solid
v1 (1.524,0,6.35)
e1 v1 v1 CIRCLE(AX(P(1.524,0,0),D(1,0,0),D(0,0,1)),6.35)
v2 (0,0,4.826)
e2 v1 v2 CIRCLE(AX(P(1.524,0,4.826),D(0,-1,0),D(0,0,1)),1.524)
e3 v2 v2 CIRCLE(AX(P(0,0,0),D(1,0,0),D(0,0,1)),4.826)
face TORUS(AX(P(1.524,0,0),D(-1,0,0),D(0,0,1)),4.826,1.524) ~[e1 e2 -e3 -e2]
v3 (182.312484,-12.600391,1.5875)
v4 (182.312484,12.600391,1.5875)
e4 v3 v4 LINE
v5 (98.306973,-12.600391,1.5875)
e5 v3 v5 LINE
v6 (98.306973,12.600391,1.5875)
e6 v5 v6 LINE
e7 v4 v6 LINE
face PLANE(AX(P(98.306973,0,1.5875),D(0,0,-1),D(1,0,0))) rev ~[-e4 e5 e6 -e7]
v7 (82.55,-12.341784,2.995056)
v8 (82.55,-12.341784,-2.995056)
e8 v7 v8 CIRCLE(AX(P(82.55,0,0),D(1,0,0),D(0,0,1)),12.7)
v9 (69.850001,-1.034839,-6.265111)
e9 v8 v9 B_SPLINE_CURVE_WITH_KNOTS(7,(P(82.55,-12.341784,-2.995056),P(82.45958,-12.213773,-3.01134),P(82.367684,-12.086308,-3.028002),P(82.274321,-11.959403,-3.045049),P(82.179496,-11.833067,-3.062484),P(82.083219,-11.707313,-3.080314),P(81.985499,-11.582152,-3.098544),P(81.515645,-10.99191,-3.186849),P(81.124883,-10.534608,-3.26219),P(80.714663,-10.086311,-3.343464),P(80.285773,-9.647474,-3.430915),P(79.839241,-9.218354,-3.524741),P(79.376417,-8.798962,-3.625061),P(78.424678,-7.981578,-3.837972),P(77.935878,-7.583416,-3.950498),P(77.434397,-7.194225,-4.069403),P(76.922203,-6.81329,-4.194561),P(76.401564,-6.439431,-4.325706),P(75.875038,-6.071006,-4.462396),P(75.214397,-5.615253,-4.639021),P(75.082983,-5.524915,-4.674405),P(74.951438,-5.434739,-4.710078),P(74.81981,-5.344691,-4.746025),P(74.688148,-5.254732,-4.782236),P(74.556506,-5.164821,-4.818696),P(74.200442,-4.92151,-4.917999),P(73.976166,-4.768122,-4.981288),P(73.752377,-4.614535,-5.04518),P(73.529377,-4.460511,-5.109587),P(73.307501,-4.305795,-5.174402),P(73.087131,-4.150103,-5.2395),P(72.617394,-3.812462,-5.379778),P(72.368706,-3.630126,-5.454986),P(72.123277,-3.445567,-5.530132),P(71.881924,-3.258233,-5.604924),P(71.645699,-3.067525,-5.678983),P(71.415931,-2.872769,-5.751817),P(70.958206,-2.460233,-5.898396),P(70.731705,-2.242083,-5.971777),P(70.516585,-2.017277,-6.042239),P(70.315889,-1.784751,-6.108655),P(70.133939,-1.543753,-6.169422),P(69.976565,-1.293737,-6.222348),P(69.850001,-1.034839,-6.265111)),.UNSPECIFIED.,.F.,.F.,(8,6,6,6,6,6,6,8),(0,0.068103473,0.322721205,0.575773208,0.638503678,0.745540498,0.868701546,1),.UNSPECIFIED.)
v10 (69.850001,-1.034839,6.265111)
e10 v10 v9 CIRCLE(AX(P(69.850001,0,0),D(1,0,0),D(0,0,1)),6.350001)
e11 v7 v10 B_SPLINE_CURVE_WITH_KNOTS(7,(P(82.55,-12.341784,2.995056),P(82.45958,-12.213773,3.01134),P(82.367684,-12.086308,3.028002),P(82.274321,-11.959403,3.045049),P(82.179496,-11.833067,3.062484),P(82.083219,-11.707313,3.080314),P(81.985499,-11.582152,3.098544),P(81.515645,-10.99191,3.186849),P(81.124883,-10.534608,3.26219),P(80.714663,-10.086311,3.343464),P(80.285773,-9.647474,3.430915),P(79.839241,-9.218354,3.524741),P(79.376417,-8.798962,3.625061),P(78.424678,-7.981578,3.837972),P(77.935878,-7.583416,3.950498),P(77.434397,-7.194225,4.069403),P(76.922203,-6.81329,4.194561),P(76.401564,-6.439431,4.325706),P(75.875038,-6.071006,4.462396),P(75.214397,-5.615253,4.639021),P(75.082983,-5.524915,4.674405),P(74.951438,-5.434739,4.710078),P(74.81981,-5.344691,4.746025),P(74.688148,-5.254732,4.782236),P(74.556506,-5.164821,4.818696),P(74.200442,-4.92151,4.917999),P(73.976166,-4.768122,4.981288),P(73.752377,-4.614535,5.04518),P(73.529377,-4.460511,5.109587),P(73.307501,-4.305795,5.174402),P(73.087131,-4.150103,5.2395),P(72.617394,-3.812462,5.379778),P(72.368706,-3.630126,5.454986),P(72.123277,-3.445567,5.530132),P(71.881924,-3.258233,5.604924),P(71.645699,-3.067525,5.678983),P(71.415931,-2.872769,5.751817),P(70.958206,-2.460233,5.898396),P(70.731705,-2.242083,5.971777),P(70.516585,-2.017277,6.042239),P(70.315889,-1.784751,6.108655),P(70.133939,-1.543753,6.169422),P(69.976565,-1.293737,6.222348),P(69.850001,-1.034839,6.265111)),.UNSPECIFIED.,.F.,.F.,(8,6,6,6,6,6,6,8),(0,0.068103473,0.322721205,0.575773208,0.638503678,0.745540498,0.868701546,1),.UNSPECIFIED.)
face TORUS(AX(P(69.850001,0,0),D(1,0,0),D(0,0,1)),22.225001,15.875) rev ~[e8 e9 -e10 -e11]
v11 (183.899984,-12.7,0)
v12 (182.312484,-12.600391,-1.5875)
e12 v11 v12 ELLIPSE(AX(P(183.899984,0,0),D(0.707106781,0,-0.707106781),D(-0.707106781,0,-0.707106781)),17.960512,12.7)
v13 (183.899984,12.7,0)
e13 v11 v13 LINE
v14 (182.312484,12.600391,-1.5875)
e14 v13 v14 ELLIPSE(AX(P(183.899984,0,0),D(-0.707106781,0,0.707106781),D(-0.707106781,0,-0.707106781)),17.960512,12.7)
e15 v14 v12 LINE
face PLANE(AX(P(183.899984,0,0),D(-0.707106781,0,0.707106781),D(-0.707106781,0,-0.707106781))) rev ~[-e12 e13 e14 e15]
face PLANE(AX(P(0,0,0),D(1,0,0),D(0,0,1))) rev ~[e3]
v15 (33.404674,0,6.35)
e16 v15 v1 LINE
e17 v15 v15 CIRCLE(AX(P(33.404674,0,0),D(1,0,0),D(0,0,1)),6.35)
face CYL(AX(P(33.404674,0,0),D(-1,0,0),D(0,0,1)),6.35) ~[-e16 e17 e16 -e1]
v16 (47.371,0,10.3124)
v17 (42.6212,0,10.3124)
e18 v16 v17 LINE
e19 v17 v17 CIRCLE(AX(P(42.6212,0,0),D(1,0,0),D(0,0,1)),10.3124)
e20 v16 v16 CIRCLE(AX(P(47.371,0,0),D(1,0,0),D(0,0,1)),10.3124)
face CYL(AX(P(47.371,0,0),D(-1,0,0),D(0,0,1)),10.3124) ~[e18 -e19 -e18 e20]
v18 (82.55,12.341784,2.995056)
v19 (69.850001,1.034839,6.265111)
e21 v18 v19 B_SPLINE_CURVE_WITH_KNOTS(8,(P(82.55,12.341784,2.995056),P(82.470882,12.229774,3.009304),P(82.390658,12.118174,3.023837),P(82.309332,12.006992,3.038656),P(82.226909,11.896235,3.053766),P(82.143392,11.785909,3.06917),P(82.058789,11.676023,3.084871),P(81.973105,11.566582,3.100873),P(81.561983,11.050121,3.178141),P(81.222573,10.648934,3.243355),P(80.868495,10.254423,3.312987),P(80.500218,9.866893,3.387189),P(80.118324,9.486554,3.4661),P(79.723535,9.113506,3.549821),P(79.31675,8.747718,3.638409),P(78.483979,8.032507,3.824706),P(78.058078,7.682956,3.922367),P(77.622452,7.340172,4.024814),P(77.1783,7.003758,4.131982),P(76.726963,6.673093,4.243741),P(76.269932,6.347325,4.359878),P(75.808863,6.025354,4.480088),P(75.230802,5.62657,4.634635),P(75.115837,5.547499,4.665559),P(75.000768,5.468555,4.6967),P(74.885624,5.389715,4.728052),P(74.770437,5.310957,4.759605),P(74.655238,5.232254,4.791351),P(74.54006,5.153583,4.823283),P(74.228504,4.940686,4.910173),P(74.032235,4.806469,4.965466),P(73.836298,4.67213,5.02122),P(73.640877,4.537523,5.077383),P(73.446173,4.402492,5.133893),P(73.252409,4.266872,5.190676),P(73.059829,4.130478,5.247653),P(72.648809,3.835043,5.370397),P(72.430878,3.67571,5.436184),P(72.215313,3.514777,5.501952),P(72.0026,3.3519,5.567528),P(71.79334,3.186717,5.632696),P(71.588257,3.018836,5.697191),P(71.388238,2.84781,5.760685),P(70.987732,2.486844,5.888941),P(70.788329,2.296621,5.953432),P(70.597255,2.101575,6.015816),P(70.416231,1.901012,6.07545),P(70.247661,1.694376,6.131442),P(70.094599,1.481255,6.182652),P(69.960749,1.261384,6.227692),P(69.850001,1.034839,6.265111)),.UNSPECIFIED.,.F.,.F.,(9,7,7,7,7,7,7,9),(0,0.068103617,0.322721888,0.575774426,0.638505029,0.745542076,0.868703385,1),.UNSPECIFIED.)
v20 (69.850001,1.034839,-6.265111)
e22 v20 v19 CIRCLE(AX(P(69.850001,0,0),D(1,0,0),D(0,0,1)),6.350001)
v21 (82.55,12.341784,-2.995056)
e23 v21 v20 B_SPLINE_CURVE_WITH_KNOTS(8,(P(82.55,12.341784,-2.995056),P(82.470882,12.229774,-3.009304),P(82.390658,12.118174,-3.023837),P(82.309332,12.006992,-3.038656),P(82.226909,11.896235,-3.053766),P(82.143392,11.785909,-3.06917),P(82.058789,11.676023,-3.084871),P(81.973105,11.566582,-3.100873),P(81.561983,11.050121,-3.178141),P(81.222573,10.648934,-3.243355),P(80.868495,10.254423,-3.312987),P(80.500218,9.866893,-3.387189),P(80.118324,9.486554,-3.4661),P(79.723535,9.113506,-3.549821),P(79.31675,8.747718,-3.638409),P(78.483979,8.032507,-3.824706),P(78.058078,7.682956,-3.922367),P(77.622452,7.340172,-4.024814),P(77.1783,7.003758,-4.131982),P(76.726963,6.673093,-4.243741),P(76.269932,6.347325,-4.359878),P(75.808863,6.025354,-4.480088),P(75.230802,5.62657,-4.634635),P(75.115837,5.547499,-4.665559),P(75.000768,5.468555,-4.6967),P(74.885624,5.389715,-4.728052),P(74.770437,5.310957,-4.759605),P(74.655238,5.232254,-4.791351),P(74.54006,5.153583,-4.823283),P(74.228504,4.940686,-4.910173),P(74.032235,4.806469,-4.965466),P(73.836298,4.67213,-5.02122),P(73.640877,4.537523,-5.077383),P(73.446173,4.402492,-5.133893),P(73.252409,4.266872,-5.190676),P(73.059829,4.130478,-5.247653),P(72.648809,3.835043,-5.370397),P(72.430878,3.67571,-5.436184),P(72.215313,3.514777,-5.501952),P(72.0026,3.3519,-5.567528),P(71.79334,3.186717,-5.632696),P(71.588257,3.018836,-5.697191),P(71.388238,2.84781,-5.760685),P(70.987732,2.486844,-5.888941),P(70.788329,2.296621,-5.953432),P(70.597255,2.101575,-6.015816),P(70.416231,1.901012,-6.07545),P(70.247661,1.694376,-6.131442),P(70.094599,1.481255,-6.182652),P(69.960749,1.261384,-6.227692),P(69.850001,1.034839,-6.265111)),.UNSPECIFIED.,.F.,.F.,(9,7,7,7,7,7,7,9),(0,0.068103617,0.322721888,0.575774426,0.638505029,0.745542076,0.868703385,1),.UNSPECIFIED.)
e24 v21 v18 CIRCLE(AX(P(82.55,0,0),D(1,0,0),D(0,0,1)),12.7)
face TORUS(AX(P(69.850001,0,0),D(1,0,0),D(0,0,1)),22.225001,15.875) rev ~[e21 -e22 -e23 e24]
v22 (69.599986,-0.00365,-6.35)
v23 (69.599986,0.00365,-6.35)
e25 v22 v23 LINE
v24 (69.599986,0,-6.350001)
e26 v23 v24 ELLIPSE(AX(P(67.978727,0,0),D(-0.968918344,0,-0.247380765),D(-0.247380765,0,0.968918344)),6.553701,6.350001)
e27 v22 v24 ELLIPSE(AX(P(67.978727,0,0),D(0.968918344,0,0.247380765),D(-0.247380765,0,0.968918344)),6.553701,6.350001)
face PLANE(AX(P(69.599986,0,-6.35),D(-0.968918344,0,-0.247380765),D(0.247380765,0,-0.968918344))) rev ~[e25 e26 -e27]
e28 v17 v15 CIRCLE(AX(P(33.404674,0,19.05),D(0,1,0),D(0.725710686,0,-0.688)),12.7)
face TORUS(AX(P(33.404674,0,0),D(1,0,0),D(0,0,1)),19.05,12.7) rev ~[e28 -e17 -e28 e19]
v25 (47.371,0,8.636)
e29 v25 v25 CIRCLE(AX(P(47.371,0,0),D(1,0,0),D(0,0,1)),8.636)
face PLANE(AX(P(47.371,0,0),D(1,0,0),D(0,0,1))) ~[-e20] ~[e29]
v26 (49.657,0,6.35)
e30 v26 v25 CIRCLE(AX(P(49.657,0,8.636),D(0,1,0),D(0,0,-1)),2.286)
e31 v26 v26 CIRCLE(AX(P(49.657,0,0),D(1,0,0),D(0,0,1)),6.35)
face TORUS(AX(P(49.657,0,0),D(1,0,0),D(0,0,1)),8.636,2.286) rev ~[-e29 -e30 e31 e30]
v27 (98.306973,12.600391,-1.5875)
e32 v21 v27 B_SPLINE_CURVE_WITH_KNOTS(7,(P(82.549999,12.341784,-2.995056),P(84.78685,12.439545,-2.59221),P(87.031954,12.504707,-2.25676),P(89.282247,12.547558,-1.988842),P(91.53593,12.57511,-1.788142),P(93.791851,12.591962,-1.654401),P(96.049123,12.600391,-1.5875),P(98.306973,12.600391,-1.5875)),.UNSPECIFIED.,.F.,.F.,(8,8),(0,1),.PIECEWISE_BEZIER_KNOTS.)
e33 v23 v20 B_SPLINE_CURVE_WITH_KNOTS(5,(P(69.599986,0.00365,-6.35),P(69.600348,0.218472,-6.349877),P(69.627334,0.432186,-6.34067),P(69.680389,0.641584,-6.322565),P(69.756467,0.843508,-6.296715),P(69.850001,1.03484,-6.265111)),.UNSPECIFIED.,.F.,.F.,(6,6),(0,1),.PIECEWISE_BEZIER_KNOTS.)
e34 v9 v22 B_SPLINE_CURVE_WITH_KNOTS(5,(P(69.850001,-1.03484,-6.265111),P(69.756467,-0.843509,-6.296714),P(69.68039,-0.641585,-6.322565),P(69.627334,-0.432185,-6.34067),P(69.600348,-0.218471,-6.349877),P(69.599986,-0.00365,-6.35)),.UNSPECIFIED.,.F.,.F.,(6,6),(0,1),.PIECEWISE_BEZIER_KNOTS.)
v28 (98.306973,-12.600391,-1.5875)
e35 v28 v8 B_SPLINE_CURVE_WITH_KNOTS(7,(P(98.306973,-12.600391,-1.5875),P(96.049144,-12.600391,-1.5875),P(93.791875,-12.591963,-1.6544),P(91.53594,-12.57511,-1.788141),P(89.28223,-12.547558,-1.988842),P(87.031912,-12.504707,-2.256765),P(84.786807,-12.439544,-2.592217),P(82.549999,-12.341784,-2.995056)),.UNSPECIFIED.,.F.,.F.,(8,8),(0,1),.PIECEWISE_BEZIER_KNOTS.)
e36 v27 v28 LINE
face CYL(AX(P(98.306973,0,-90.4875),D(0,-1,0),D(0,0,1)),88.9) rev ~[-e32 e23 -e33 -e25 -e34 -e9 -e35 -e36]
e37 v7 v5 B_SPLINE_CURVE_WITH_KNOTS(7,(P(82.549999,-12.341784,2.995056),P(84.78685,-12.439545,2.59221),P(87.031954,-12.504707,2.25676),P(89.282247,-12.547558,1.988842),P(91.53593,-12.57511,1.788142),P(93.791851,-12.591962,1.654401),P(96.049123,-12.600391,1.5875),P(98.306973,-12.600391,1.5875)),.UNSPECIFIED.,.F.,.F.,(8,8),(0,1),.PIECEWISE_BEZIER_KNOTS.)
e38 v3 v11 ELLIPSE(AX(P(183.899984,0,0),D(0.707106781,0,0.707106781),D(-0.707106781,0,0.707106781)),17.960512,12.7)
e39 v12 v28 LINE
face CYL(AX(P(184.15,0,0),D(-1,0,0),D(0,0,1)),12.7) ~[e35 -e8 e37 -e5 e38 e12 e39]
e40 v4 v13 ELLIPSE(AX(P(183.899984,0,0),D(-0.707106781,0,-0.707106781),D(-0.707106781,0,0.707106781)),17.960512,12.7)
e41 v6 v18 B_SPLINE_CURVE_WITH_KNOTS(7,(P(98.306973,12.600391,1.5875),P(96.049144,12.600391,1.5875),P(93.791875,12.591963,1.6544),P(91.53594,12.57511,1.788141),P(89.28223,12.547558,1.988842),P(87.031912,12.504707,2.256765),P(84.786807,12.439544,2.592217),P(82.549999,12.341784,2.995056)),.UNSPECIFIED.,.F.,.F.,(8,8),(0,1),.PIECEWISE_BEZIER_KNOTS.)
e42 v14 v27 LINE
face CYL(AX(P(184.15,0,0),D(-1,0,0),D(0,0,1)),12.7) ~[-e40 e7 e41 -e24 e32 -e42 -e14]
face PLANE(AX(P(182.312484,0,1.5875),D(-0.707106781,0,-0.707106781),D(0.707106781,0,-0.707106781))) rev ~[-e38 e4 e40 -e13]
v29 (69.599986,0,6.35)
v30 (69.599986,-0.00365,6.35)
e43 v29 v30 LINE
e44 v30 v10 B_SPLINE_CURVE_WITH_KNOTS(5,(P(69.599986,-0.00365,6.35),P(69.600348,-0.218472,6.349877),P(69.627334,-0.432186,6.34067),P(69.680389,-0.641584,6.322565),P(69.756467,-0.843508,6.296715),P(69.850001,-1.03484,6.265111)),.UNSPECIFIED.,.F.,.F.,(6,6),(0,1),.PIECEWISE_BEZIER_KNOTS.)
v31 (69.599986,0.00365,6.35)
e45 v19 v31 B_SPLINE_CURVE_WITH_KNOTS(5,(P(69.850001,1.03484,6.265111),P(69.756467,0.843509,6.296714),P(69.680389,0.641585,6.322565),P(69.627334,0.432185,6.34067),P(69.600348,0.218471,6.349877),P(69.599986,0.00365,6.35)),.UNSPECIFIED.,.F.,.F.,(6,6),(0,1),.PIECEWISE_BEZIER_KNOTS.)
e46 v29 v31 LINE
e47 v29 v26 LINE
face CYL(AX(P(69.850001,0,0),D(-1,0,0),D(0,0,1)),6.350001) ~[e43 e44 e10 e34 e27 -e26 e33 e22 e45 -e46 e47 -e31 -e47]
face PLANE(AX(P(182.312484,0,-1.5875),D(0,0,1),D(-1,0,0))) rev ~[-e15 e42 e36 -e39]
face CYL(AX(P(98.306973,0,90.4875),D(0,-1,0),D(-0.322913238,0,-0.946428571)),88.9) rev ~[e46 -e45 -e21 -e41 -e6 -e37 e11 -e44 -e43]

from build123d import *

# Parameters (mm, degrees)
F3_DEPTH = 25.4
F4_DEPTH = 25.4


# Not quite as in the source:
# - ends of sketch curves that miss each other by under 0.0002 mm in the source are joined


with BuildPart() as f1:
    # F0 (on Front) → F1 (revolve)
    with BuildSketch(Plane.XZ):
        with BuildLine():
            Line((0, 4.826), (0, 0))
            Line((0, 0), (184.15, 0))
            Line((184.15, 0), (184.15, 12.7))
            Line((184.15, 12.7), (82.55, 12.7))
            ThreePointArc((82.55, 12.7), (76.9495160289, 8.0259690987), (69.8500007868, 6.350001049))
            Line((69.8500007868, 6.350001049), (49.657, 6.35))
            ThreePointArc((49.657, 6.35), (48.0405538982, 7.0195538982), (47.371, 8.636))
            Line((47.371, 8.636), (47.371, 10.3124))
            Line((47.371, 10.3124), (42.6212, 10.3124))
            ThreePointArc((42.6212, 10.3124), (38.420772371, 7.3825769769), (33.4046742858, 6.35))
            Line((33.4046742858, 6.35), (1.524, 6.35))
            ThreePointArc((1.524, 6.35), (0.4463692655, 5.9036307345), (0, 4.826))
        make_face()
    revolve(axis=Axis((92.075, 0, 0), (1, 0, 0)))

    # F2 (on Front) → F3 (cut)
    with BuildSketch(Plane.XZ):
        with BuildLine():
            Line((189.3032044172, 0), (183.8999837637, 0))
            Line((183.8999837637, 0), (182.3124837637, -1.5875))
            Line((182.3124837637, -1.5875), (98.3069729219, -1.5875))
            ThreePointArc((98.3069729219, -1.5875), (83.7572950904, -2.7862065375), (69.5999860764, -6.35))
            Line((69.5999860764, -6.35), (82.516618073, -56.9406822324))
            Line((82.516618073, -56.9406822324), (124.9158531427, -44.9918061495))
            Line((124.9158531427, -44.9918061495), (189.3032044172, -23.9094942808))
            Line((189.3032044172, -23.9094942808), (189.3032044172, 0))
        make_face()
        with BuildLine():
            Line((182.3124837637, 1.5875), (183.8999837637, 0))
            Line((183.8999837637, 0), (189.3032044172, 0))
            Line((189.3032044172, 0), (189.3032044172, 23.9094942808))
            Line((189.3032044172, 23.9094942808), (183.8999837637, 25.6786675836))
            Line((183.8999837637, 25.6786675836), (124.9158531427, 44.9918061495))
            Line((124.9158531427, 44.9918061495), (82.516618073, 56.9406822324))
            Line((82.516618073, 56.9406822324), (69.5999860764, 6.35))
            ThreePointArc((69.5999860764, 6.35), (83.7572950904, 2.7862065375), (98.3069729219, 1.5875))
            Line((98.3069729219, 1.5875), (182.3124837637, 1.5875))
        make_face()
    extrude(amount=-F3_DEPTH, mode=Mode.SUBTRACT)

    # F2 (on Front) → F4 (cut)
    with BuildSketch(Plane.XZ):
        with BuildLine():
            Line((182.3124837637, 1.5875), (183.8999837637, 0))
            Line((183.8999837637, 0), (189.3032044172, 0))
            Line((189.3032044172, 0), (189.3032044172, 23.9094942808))
            Line((189.3032044172, 23.9094942808), (183.8999837637, 25.6786675836))
            Line((183.8999837637, 25.6786675836), (124.9158531427, 44.9918061495))
            Line((124.9158531427, 44.9918061495), (82.516618073, 56.9406822324))
            Line((82.516618073, 56.9406822324), (69.5999860764, 6.35))
            ThreePointArc((69.5999860764, 6.35), (83.7572950904, 2.7862065375), (98.3069729219, 1.5875))
            Line((98.3069729219, 1.5875), (182.3124837637, 1.5875))
        make_face()
        with BuildLine():
            Line((189.3032044172, 0), (183.8999837637, 0))
            Line((183.8999837637, 0), (182.3124837637, -1.5875))
            Line((182.3124837637, -1.5875), (98.3069729219, -1.5875))
            ThreePointArc((98.3069729219, -1.5875), (83.7572950904, -2.7862065375), (69.5999860764, -6.35))
            Line((69.5999860764, -6.35), (82.516618073, -56.9406822324))
            Line((82.516618073, -56.9406822324), (124.9158531427, -44.9918061495))
            Line((124.9158531427, -44.9918061495), (189.3032044172, -23.9094942808))
            Line((189.3032044172, -23.9094942808), (189.3032044172, 0))
        make_face()
    extrude(amount=F4_DEPTH, mode=Mode.SUBTRACT)


solid = f1.part
